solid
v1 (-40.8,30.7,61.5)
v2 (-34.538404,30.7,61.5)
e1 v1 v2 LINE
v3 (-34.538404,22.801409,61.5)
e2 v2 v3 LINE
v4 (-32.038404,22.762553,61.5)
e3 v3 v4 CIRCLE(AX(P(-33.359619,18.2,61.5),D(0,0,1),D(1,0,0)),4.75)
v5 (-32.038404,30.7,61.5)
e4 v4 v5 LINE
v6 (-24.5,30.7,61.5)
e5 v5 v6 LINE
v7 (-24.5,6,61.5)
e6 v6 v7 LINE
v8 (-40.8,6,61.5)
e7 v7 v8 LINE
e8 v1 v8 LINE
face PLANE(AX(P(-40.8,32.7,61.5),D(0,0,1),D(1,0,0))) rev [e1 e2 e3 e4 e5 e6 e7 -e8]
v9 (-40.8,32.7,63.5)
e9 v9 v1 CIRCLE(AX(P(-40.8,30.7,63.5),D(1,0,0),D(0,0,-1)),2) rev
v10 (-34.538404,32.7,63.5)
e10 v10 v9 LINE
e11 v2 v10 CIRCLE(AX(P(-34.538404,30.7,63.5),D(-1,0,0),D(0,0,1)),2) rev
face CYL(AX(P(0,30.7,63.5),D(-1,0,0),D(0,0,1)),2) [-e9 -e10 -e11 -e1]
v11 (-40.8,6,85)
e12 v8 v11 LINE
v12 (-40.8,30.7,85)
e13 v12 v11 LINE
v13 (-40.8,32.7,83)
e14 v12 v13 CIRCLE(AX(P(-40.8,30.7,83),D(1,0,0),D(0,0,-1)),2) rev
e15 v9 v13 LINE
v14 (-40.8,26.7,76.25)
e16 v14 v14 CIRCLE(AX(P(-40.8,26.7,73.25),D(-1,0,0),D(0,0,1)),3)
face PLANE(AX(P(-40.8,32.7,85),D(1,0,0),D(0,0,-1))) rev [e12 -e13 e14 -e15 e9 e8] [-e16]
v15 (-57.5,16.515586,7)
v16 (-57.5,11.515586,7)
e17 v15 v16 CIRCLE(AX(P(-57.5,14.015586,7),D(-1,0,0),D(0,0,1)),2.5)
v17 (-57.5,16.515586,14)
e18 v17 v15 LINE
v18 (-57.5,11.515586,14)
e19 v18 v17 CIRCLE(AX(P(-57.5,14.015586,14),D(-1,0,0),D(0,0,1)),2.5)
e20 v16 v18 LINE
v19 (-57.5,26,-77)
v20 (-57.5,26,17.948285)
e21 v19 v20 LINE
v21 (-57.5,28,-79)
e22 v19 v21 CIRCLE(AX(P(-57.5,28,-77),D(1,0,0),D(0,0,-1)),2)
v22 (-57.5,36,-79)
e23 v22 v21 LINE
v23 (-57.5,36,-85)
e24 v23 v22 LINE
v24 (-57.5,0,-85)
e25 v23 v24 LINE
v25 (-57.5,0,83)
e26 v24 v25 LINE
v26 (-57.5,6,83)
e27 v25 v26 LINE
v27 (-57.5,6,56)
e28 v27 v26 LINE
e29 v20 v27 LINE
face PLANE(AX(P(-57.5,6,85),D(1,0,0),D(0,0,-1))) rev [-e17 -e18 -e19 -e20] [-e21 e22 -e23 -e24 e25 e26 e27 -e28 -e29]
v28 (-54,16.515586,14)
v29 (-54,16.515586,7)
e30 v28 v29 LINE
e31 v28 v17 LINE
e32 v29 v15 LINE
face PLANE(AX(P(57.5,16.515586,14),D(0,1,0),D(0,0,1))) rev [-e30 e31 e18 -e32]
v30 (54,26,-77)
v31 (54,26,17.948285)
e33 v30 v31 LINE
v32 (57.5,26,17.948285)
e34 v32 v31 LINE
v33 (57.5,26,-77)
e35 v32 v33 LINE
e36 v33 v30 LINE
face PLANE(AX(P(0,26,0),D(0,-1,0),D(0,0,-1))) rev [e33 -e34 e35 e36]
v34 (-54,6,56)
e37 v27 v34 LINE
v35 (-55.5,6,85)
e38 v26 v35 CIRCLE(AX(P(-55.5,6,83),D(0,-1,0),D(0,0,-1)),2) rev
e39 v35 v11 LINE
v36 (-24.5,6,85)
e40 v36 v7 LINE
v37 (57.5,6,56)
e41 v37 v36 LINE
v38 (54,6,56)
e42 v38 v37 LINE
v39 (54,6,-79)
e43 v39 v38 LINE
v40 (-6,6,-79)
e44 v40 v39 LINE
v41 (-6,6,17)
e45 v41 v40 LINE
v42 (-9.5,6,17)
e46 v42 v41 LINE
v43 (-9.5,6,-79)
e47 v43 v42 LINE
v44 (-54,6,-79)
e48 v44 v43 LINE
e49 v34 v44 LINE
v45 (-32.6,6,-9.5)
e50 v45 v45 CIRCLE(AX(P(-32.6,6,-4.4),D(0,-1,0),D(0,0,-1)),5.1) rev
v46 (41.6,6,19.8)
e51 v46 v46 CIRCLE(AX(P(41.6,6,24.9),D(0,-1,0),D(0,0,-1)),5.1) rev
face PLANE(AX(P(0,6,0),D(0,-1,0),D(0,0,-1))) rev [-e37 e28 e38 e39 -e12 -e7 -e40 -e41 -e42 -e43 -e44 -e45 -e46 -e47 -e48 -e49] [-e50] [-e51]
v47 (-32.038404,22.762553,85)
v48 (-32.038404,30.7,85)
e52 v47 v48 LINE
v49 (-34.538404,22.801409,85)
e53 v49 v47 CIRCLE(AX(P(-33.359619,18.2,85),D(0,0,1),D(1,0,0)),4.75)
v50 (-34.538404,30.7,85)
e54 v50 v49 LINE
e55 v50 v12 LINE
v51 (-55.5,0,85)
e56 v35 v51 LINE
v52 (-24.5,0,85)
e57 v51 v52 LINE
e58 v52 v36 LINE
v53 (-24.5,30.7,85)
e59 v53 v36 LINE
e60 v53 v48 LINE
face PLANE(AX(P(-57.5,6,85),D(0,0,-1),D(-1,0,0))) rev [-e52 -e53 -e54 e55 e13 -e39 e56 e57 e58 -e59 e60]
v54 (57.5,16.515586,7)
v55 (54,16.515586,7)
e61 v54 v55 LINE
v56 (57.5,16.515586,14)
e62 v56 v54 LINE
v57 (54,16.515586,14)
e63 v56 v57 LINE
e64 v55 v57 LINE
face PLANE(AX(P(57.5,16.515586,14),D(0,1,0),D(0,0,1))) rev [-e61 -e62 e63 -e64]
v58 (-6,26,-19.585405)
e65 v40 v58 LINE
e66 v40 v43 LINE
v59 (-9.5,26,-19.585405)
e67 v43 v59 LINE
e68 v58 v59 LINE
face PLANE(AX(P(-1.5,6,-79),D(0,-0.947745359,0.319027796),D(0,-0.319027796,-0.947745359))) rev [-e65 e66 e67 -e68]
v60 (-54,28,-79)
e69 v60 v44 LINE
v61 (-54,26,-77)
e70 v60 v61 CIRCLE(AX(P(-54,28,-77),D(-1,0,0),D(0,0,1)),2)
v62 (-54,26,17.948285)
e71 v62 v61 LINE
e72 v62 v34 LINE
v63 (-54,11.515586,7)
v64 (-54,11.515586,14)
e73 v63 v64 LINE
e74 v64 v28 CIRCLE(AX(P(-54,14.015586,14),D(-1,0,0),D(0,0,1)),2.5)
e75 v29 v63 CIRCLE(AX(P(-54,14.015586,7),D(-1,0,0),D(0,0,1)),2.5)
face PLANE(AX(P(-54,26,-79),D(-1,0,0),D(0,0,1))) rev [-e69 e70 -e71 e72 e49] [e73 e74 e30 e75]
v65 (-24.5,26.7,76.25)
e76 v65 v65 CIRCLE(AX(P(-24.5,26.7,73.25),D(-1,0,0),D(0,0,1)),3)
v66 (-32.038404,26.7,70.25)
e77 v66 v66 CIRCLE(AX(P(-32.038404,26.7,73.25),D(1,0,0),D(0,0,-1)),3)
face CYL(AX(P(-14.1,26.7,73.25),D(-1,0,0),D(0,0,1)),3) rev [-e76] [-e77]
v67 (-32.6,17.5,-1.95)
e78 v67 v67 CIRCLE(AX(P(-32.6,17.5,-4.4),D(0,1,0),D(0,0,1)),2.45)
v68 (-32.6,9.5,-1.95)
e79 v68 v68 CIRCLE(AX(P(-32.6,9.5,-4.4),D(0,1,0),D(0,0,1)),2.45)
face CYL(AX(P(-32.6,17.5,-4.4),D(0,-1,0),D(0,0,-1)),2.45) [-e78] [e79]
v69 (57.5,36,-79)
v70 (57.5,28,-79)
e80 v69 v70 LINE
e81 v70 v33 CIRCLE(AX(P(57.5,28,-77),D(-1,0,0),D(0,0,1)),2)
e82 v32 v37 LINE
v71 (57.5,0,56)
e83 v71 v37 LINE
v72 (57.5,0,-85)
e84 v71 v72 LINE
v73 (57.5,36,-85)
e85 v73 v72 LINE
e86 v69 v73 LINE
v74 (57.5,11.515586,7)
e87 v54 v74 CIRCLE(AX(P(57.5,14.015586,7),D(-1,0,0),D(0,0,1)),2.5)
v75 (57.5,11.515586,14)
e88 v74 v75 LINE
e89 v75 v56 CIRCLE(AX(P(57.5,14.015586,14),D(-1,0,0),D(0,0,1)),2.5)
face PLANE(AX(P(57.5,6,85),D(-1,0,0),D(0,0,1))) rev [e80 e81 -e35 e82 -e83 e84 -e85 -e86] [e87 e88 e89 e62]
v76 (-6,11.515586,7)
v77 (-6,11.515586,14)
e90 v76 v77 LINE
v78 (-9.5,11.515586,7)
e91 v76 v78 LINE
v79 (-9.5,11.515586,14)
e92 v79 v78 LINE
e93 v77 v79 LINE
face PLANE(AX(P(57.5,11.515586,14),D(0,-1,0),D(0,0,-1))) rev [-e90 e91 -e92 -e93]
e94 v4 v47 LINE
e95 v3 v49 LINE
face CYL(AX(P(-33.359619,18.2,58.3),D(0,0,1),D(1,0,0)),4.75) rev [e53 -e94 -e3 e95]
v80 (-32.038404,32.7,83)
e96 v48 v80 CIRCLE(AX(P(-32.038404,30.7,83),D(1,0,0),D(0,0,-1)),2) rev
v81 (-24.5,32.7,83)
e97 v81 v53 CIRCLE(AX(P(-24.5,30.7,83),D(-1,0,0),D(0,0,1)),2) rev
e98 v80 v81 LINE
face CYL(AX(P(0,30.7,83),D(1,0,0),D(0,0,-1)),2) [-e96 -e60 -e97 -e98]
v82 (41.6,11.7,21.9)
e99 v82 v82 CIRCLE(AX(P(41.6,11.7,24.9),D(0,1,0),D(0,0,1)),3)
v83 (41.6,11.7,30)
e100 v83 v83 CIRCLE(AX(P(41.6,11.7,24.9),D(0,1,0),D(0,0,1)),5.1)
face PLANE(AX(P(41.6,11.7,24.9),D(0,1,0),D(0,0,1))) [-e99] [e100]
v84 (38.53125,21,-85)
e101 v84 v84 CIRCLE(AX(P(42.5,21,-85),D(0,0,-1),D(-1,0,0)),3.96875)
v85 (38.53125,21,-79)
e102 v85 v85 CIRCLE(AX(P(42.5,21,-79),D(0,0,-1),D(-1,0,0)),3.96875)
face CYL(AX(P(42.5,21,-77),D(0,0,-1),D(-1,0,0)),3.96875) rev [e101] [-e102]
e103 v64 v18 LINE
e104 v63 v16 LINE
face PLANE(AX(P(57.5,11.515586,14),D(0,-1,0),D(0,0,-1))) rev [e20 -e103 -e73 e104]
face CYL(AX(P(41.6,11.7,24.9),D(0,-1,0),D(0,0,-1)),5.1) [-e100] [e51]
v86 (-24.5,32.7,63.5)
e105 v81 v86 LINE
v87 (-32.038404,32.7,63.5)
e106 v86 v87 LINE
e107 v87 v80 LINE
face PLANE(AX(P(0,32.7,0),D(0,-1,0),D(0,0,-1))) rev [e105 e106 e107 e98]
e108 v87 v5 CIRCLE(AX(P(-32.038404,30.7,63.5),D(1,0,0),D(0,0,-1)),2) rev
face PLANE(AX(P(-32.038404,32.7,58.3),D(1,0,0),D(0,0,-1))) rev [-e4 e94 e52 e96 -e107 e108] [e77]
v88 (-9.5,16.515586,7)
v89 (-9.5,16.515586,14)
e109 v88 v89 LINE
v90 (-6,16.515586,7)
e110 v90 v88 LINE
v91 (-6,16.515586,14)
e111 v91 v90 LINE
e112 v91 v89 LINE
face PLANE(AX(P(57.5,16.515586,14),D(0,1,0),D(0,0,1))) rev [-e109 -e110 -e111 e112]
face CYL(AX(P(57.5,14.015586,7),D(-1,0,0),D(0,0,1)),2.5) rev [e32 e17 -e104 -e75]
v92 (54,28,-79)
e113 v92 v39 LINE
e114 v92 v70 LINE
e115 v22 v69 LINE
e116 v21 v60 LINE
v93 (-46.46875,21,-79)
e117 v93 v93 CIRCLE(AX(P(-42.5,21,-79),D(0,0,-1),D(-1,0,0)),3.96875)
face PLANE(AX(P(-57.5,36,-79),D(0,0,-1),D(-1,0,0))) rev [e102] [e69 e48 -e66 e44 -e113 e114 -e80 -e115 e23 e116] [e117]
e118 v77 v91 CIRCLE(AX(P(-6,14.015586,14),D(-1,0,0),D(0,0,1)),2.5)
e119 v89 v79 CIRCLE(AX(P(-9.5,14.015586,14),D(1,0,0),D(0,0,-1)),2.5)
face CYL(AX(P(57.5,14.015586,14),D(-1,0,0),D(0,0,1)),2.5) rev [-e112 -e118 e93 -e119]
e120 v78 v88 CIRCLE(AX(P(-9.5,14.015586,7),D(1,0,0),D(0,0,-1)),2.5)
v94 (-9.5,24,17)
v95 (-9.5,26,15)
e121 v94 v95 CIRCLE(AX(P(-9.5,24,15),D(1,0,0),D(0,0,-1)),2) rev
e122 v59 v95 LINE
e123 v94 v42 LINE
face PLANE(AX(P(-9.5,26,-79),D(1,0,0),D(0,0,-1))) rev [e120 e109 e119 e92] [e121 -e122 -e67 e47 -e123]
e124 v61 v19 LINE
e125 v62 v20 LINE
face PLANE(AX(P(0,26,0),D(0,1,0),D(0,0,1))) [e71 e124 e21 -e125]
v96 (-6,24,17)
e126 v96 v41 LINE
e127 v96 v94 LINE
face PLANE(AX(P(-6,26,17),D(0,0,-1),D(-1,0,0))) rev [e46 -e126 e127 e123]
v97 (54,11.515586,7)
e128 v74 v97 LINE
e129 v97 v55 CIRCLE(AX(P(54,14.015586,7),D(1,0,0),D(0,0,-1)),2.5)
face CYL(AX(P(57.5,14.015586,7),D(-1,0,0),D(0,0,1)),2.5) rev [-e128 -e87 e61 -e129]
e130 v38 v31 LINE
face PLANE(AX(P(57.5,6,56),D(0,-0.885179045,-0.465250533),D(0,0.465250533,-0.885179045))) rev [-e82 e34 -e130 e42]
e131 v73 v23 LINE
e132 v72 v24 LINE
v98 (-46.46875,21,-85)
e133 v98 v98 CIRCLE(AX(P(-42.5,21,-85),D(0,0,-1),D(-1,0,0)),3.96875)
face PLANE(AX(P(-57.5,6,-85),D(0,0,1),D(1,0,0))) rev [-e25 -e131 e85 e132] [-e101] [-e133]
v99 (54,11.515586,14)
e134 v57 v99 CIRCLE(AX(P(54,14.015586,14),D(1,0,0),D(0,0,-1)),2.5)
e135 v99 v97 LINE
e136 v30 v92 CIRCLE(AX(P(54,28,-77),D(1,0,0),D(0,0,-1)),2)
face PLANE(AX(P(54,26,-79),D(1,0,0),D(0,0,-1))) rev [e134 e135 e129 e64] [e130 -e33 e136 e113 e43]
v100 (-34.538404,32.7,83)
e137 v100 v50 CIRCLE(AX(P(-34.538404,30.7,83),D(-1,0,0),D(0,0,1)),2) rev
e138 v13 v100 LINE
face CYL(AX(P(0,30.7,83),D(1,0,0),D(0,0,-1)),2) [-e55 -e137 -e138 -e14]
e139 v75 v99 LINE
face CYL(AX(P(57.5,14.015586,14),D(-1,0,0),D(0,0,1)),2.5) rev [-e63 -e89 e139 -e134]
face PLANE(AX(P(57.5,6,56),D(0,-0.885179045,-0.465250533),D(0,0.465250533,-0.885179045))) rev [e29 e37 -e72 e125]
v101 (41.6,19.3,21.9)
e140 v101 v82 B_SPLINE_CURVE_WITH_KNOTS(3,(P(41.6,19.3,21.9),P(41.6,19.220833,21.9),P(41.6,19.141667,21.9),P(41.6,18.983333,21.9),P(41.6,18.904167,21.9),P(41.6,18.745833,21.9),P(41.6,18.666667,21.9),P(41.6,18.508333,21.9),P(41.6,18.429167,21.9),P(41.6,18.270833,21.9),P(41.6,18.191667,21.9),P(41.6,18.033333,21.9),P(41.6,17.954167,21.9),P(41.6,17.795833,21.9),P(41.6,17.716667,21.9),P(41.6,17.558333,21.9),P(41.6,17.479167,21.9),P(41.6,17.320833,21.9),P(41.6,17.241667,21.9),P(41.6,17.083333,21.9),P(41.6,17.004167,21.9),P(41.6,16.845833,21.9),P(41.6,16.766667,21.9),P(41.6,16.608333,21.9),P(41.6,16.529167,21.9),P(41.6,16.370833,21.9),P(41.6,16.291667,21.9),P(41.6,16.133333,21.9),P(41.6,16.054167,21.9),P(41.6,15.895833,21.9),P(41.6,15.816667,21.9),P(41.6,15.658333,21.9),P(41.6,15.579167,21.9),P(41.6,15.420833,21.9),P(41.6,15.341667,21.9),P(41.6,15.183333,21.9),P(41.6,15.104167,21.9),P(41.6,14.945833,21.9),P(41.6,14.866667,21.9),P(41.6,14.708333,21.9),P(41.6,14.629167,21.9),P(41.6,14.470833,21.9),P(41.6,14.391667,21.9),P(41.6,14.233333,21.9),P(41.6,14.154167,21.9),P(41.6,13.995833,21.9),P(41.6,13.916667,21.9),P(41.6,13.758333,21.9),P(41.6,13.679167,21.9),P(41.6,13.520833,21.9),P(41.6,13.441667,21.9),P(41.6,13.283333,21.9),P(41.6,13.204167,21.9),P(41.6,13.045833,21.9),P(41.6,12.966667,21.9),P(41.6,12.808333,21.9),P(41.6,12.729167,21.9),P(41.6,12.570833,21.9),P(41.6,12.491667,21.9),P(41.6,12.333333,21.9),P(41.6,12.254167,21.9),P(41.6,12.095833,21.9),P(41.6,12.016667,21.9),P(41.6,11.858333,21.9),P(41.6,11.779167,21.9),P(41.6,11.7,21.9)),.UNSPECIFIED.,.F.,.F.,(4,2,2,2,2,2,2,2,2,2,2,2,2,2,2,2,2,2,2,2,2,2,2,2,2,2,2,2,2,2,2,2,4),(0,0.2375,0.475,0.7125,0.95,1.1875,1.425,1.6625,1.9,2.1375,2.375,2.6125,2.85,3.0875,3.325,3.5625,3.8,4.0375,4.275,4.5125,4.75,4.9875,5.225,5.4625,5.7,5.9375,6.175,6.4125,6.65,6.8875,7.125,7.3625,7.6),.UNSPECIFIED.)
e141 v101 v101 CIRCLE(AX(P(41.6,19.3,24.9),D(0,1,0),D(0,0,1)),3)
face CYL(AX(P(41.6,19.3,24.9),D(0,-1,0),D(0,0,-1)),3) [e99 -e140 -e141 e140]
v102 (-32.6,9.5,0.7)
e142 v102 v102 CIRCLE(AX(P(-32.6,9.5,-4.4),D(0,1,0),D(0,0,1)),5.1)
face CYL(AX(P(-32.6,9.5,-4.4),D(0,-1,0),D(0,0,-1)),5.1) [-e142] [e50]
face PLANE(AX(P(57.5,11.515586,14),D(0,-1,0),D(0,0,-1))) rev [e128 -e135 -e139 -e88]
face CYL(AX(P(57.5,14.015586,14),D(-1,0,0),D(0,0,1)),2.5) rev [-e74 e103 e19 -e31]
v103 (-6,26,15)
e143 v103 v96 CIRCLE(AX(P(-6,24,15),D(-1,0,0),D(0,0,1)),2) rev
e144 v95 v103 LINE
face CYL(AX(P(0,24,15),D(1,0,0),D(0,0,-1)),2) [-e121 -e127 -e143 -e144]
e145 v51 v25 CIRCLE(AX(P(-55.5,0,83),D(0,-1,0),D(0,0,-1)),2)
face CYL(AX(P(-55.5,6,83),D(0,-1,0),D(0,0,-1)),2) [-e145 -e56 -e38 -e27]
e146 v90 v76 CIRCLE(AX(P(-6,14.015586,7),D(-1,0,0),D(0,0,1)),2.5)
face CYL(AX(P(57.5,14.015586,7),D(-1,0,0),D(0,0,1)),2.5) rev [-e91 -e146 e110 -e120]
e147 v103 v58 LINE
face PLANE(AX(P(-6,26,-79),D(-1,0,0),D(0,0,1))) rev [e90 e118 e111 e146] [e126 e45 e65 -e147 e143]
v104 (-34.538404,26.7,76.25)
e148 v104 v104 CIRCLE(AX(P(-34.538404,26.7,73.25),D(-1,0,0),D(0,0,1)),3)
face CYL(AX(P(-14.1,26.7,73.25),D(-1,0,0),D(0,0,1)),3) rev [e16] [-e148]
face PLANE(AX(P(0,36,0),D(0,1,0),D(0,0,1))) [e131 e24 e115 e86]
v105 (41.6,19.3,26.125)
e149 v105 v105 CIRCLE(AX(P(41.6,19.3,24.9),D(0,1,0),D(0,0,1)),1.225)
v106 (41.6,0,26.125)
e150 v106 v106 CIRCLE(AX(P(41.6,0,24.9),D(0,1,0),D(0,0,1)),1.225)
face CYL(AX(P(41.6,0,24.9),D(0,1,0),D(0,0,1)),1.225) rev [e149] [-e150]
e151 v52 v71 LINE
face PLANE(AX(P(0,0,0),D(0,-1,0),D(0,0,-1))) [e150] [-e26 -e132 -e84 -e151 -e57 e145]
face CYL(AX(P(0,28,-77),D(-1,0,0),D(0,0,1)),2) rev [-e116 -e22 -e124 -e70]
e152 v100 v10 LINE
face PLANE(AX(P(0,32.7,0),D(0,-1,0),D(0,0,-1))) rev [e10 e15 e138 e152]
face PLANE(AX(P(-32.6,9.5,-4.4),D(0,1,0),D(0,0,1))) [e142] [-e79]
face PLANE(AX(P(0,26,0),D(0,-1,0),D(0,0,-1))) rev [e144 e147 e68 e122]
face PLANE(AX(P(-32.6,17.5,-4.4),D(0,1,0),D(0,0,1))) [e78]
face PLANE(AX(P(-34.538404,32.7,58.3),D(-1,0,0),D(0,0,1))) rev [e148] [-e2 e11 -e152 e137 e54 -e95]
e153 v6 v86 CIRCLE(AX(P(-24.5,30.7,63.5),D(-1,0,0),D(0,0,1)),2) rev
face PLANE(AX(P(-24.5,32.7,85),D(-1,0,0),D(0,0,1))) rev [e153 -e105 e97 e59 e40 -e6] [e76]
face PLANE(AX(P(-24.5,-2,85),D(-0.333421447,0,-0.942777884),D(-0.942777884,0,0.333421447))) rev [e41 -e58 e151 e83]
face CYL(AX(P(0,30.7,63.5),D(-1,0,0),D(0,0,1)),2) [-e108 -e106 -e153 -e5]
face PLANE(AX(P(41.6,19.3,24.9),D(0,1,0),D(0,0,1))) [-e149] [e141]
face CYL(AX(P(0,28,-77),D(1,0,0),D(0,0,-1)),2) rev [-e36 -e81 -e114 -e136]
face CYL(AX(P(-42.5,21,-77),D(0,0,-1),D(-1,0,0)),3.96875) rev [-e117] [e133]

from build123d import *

# Parameters (mm, degrees)
SKETCH1_W                               = 115
SKETCH1_H                               = 170
BACK_WALL_EXTRUDE_DEPTH                 = 6
SKETCH2_W                               = 115
SKETCH2_H                               = 6
BOTTOM_PLATE_EXTRUDE_DEPTH              = 30
SKETCH3_W                               = 3.5
SKETCH3_H                               = 135
SKETCH3_H_2                             = 96
SIDE_WALLS_EXTRUDE_DEPTH                = 20
SKETCH4_W                               = 16.3
SKETCH4_H                               = 23.5
DIAL_INDIACTOR_HOLDER_EXTRUDE_DEPTH     = 26.7
DIAL_INDICATOR_HOLE_CUT_DEPTH           = 26.7
SKETCH6_R                               = 3
DIAL_INDICATOR_TIGHTENER_HOLE_CUT_DEPTH = 26.7
SKETCH7_R                               = 5.1
ARM_BASE_EXTRUDE_DEPTH                  = 5.7
SKETCH8_R                               = 3
ARM_AXLE_EXTRUDE_DEPTH                  = 7.6
SKETCH9_R                               = 5.1
GUIDE_WHEEL_BASE_EXTRUDE_DEPTH          = 3.5
SKETCH10_R                              = 2.45
GUIDE_WHEEL_AXLE_EXTRUDE_DEPTH          = 8
FILAMENT_START                          = 71.967294703
FILAMENT_SLOT_CUT_OUTLINE_W             = 100
FILAMENT_SLOT_CUT_OUTLINE_H             = 6
FILAMENT_SLOT_CUT_DEPTH                 = 27.34055864
FILAMENT_START_2                        = -115
FILAMENT_SLOT_CUT_2_DEPTH               = 116
SKETCH13_R                              = 3.96875
MOUNTING_HOLES_CUT_DEPTH                = 8
FILLET1_R                               = 2
CUT_EXTRUDE9_DEPTH                      = 8
SKETCH15_R                              = 1.225
SCREW_HOLE_CUT_DEPTH                    = 105.420974904
CUT_EXTRUDE11_DEPTH                     = 148.465250144


with BuildPart() as part:
    # Sketch1 → Back Wall Extrude (new body)
    with BuildSketch(Plane(origin=(0, 0, 0), x_dir=(1, 0, 0), z_dir=(0, 1, 0))):
        Rectangle(SKETCH1_W, SKETCH1_H)
    extrude(amount=BACK_WALL_EXTRUDE_DEPTH)

    # Sketch2 → Bottom Plate Extrude (add)
    with BuildSketch(Plane(origin=(0, 6, 0), x_dir=(1, 0, 0), z_dir=(0, 1, 0))):
        with Locations((0, 82)):
            Rectangle(SKETCH2_W, SKETCH2_H)
    extrude(amount=BOTTOM_PLATE_EXTRUDE_DEPTH)

    # Sketch3 → Side Walls Extrude (add)
    with BuildSketch(Plane(origin=(0, 6, 0), x_dir=(1, 0, 0), z_dir=(0, 1, 0))):
        with Locations((-55.75, 11.5)):
            Rectangle(SKETCH3_W, SKETCH3_H)
        with Locations((55.75, 11.5)):
            Rectangle(SKETCH3_W, SKETCH3_H)
        with Locations((-7.75, 31)):
            Rectangle(SKETCH3_W, SKETCH3_H_2)
    extrude(amount=SIDE_WALLS_EXTRUDE_DEPTH)

    # Sketch4 → Dial Indiactor Holder Extrude (add)
    with BuildSketch(Plane(origin=(0, 6, 0), x_dir=(1, 0, 0), z_dir=(0, 1, 0))):
        with Locations((-32.65, -73.25)):
            Rectangle(SKETCH4_W, SKETCH4_H)
    extrude(amount=DIAL_INDIACTOR_HOLDER_EXTRUDE_DEPTH)

    # Sketch5 → Dial Indicator Hole Cut (cut)
    with BuildSketch(Plane.XY.offset(85)):
        with BuildLine():
            Line((-34.538403692, 32.7), (-32.038403692, 32.7))
            Line((-32.038403692, 32.7), (-32.038403692, 22.762553146))
            ThreePointArc((-32.038403692, 22.762553146), (-33.433435972, 13.450573614), (-34.538403692, 22.801409096))
            Line((-34.538403692, 22.801409096), (-34.538403692, 32.7))
        make_face()
    extrude(amount=-DIAL_INDICATOR_HOLE_CUT_DEPTH, mode=Mode.SUBTRACT)

    # Sketch6 → Dial Indicator Tightener Hole Cut (cut)
    with BuildSketch(Plane.ZY.offset(40.8)):
        with Locations((73.25, 26.7)):
            Circle(SKETCH6_R)
    extrude(amount=-DIAL_INDICATOR_TIGHTENER_HOLE_CUT_DEPTH, mode=Mode.SUBTRACT)

    # Sketch7 → Arm Base Extrude (add)
    with BuildSketch(Plane(origin=(0, 6, 0), x_dir=(1, 0, 0), z_dir=(0, 1, 0))):
        with Locations(Location((41.6, -24.9, 0), (0, 0, 90))):
            Circle(SKETCH7_R)
    extrude(amount=ARM_BASE_EXTRUDE_DEPTH)

    # Sketch8 → Arm Axle Extrude (add)
    with BuildSketch(Plane(origin=(0, 11.7, 0), x_dir=(1, 0, 0), z_dir=(0, 1, 0))):
        with Locations(Location((41.6, -24.9, 0), (0, 0, 90))):
            Circle(SKETCH8_R)
    extrude(amount=ARM_AXLE_EXTRUDE_DEPTH)

    # Sketch9 → Guide Wheel Base Extrude (add)
    with BuildSketch(Plane(origin=(0, 6, 0), x_dir=(1, 0, 0), z_dir=(0, 1, 0))):
        with Locations(Location((-32.6, 4.4, 0), (0, 0, 90))):
            Circle(SKETCH9_R)
    extrude(amount=GUIDE_WHEEL_BASE_EXTRUDE_DEPTH)

    # Sketch10 → Guide Wheel Axle Extrude (add)
    with BuildSketch(Plane(origin=(0, 9.5, 0), x_dir=(1, 0, 0), z_dir=(0, 1, 0))):
        with Locations(Location((-32.6, 4.4, 0), (0, 0, 270))):
            Circle(SKETCH10_R)
    extrude(amount=GUIDE_WHEEL_AXLE_EXTRUDE_DEPTH)

    # Filament Slot Cut: read off the stored shape, not the designer's step
    # Filament Slot Cut outline → Filament Slot Cut (cut)
    with BuildSketch(Plane(origin=(0, 0, 0), x_dir=(0.942777884125997, 0, -0.333421446825048), z_dir=(0.333421446825048, 0, 0.942777884125997)).offset(FILAMENT_START)):
        with Locations((-3, 3)):
            Rectangle(FILAMENT_SLOT_CUT_OUTLINE_W, FILAMENT_SLOT_CUT_OUTLINE_H)
    extrude(amount=FILAMENT_SLOT_CUT_DEPTH, mode=Mode.SUBTRACT)

    # Filament Slot Cut 2 outline → Filament Slot Cut 2 (cut)
    with BuildSketch(Plane.ZY.offset(57.5).offset(FILAMENT_START_2)):
        with BuildLine():
            ThreePointArc((14, 11.51558642), (16.5, 14.01558642), (14, 16.51558642))
            Line((14, 16.51558642), (7, 16.51558642))
            ThreePointArc((7, 16.51558642), (4.5, 14.01558642), (7, 11.51558642))
            Line((7, 11.51558642), (14, 11.51558642))
        make_face()
    extrude(amount=FILAMENT_SLOT_CUT_2_DEPTH, mode=Mode.SUBTRACT)

    # Sketch13 → Mounting Holes Cut (cut)
    with BuildSketch(Plane(origin=(0, 0, -85), x_dir=(-1, 0, 0), z_dir=(0, 0, -1))):
        with Locations((42.5, 21)):
            Circle(SKETCH13_R)
        with Locations((-42.5, 21)):
            Circle(SKETCH13_R)
    extrude(amount=-MOUNTING_HOLES_CUT_DEPTH, mode=Mode.SUBTRACT)

    # Fillet1
    fillet1_edges = [part.edges().sort_by_distance(p)[0] for p in [
        (-55.75, 26, 56),
        (-55.75, 26, -79),
        (55.75, 26, -79),
        (55.75, 26, 56),
        (-7.75, 26, 17),
        (-37.669201846, 32.7, 85),
        (-28.269201846, 32.7, 61.5),
        (-57.5, 3, 85),
        (-28.269201846, 32.7, 85),
        (-37.669201846, 32.7, 61.5),
    ]]
    fillet(fillet1_edges, radius=FILLET1_R)

    # Sketch14 → Cut-Extrude9 (cut)
    with BuildSketch(Plane.ZY.offset(9.5)):
        Polygon((-79, 6), (-19.585405324, 26), (-79, 26), align=None)
    extrude(amount=-CUT_EXTRUDE9_DEPTH, mode=Mode.SUBTRACT)

    # Sketch15 → Screw Hole Cut (cut, through all)
    with BuildSketch(Plane(origin=(0, 19.3, 0), x_dir=(1, 0, 0), z_dir=(0, 1, 0))):
        with Locations(Location((41.6, -24.9, 0), (0, 0, 270))):
            Circle(SKETCH15_R)
    extrude(amount=-SCREW_HOLE_CUT_DEPTH, mode=Mode.SUBTRACT)

    # Sketch16 → Cut-Extrude11 (cut, through all)
    with BuildSketch(Plane.ZY.offset(57.5)):
        Polygon((56, 6), (17.948284572, 26), (56, 26), align=None)
    extrude(amount=-CUT_EXTRUDE11_DEPTH, mode=Mode.SUBTRACT)


solid = part.part
